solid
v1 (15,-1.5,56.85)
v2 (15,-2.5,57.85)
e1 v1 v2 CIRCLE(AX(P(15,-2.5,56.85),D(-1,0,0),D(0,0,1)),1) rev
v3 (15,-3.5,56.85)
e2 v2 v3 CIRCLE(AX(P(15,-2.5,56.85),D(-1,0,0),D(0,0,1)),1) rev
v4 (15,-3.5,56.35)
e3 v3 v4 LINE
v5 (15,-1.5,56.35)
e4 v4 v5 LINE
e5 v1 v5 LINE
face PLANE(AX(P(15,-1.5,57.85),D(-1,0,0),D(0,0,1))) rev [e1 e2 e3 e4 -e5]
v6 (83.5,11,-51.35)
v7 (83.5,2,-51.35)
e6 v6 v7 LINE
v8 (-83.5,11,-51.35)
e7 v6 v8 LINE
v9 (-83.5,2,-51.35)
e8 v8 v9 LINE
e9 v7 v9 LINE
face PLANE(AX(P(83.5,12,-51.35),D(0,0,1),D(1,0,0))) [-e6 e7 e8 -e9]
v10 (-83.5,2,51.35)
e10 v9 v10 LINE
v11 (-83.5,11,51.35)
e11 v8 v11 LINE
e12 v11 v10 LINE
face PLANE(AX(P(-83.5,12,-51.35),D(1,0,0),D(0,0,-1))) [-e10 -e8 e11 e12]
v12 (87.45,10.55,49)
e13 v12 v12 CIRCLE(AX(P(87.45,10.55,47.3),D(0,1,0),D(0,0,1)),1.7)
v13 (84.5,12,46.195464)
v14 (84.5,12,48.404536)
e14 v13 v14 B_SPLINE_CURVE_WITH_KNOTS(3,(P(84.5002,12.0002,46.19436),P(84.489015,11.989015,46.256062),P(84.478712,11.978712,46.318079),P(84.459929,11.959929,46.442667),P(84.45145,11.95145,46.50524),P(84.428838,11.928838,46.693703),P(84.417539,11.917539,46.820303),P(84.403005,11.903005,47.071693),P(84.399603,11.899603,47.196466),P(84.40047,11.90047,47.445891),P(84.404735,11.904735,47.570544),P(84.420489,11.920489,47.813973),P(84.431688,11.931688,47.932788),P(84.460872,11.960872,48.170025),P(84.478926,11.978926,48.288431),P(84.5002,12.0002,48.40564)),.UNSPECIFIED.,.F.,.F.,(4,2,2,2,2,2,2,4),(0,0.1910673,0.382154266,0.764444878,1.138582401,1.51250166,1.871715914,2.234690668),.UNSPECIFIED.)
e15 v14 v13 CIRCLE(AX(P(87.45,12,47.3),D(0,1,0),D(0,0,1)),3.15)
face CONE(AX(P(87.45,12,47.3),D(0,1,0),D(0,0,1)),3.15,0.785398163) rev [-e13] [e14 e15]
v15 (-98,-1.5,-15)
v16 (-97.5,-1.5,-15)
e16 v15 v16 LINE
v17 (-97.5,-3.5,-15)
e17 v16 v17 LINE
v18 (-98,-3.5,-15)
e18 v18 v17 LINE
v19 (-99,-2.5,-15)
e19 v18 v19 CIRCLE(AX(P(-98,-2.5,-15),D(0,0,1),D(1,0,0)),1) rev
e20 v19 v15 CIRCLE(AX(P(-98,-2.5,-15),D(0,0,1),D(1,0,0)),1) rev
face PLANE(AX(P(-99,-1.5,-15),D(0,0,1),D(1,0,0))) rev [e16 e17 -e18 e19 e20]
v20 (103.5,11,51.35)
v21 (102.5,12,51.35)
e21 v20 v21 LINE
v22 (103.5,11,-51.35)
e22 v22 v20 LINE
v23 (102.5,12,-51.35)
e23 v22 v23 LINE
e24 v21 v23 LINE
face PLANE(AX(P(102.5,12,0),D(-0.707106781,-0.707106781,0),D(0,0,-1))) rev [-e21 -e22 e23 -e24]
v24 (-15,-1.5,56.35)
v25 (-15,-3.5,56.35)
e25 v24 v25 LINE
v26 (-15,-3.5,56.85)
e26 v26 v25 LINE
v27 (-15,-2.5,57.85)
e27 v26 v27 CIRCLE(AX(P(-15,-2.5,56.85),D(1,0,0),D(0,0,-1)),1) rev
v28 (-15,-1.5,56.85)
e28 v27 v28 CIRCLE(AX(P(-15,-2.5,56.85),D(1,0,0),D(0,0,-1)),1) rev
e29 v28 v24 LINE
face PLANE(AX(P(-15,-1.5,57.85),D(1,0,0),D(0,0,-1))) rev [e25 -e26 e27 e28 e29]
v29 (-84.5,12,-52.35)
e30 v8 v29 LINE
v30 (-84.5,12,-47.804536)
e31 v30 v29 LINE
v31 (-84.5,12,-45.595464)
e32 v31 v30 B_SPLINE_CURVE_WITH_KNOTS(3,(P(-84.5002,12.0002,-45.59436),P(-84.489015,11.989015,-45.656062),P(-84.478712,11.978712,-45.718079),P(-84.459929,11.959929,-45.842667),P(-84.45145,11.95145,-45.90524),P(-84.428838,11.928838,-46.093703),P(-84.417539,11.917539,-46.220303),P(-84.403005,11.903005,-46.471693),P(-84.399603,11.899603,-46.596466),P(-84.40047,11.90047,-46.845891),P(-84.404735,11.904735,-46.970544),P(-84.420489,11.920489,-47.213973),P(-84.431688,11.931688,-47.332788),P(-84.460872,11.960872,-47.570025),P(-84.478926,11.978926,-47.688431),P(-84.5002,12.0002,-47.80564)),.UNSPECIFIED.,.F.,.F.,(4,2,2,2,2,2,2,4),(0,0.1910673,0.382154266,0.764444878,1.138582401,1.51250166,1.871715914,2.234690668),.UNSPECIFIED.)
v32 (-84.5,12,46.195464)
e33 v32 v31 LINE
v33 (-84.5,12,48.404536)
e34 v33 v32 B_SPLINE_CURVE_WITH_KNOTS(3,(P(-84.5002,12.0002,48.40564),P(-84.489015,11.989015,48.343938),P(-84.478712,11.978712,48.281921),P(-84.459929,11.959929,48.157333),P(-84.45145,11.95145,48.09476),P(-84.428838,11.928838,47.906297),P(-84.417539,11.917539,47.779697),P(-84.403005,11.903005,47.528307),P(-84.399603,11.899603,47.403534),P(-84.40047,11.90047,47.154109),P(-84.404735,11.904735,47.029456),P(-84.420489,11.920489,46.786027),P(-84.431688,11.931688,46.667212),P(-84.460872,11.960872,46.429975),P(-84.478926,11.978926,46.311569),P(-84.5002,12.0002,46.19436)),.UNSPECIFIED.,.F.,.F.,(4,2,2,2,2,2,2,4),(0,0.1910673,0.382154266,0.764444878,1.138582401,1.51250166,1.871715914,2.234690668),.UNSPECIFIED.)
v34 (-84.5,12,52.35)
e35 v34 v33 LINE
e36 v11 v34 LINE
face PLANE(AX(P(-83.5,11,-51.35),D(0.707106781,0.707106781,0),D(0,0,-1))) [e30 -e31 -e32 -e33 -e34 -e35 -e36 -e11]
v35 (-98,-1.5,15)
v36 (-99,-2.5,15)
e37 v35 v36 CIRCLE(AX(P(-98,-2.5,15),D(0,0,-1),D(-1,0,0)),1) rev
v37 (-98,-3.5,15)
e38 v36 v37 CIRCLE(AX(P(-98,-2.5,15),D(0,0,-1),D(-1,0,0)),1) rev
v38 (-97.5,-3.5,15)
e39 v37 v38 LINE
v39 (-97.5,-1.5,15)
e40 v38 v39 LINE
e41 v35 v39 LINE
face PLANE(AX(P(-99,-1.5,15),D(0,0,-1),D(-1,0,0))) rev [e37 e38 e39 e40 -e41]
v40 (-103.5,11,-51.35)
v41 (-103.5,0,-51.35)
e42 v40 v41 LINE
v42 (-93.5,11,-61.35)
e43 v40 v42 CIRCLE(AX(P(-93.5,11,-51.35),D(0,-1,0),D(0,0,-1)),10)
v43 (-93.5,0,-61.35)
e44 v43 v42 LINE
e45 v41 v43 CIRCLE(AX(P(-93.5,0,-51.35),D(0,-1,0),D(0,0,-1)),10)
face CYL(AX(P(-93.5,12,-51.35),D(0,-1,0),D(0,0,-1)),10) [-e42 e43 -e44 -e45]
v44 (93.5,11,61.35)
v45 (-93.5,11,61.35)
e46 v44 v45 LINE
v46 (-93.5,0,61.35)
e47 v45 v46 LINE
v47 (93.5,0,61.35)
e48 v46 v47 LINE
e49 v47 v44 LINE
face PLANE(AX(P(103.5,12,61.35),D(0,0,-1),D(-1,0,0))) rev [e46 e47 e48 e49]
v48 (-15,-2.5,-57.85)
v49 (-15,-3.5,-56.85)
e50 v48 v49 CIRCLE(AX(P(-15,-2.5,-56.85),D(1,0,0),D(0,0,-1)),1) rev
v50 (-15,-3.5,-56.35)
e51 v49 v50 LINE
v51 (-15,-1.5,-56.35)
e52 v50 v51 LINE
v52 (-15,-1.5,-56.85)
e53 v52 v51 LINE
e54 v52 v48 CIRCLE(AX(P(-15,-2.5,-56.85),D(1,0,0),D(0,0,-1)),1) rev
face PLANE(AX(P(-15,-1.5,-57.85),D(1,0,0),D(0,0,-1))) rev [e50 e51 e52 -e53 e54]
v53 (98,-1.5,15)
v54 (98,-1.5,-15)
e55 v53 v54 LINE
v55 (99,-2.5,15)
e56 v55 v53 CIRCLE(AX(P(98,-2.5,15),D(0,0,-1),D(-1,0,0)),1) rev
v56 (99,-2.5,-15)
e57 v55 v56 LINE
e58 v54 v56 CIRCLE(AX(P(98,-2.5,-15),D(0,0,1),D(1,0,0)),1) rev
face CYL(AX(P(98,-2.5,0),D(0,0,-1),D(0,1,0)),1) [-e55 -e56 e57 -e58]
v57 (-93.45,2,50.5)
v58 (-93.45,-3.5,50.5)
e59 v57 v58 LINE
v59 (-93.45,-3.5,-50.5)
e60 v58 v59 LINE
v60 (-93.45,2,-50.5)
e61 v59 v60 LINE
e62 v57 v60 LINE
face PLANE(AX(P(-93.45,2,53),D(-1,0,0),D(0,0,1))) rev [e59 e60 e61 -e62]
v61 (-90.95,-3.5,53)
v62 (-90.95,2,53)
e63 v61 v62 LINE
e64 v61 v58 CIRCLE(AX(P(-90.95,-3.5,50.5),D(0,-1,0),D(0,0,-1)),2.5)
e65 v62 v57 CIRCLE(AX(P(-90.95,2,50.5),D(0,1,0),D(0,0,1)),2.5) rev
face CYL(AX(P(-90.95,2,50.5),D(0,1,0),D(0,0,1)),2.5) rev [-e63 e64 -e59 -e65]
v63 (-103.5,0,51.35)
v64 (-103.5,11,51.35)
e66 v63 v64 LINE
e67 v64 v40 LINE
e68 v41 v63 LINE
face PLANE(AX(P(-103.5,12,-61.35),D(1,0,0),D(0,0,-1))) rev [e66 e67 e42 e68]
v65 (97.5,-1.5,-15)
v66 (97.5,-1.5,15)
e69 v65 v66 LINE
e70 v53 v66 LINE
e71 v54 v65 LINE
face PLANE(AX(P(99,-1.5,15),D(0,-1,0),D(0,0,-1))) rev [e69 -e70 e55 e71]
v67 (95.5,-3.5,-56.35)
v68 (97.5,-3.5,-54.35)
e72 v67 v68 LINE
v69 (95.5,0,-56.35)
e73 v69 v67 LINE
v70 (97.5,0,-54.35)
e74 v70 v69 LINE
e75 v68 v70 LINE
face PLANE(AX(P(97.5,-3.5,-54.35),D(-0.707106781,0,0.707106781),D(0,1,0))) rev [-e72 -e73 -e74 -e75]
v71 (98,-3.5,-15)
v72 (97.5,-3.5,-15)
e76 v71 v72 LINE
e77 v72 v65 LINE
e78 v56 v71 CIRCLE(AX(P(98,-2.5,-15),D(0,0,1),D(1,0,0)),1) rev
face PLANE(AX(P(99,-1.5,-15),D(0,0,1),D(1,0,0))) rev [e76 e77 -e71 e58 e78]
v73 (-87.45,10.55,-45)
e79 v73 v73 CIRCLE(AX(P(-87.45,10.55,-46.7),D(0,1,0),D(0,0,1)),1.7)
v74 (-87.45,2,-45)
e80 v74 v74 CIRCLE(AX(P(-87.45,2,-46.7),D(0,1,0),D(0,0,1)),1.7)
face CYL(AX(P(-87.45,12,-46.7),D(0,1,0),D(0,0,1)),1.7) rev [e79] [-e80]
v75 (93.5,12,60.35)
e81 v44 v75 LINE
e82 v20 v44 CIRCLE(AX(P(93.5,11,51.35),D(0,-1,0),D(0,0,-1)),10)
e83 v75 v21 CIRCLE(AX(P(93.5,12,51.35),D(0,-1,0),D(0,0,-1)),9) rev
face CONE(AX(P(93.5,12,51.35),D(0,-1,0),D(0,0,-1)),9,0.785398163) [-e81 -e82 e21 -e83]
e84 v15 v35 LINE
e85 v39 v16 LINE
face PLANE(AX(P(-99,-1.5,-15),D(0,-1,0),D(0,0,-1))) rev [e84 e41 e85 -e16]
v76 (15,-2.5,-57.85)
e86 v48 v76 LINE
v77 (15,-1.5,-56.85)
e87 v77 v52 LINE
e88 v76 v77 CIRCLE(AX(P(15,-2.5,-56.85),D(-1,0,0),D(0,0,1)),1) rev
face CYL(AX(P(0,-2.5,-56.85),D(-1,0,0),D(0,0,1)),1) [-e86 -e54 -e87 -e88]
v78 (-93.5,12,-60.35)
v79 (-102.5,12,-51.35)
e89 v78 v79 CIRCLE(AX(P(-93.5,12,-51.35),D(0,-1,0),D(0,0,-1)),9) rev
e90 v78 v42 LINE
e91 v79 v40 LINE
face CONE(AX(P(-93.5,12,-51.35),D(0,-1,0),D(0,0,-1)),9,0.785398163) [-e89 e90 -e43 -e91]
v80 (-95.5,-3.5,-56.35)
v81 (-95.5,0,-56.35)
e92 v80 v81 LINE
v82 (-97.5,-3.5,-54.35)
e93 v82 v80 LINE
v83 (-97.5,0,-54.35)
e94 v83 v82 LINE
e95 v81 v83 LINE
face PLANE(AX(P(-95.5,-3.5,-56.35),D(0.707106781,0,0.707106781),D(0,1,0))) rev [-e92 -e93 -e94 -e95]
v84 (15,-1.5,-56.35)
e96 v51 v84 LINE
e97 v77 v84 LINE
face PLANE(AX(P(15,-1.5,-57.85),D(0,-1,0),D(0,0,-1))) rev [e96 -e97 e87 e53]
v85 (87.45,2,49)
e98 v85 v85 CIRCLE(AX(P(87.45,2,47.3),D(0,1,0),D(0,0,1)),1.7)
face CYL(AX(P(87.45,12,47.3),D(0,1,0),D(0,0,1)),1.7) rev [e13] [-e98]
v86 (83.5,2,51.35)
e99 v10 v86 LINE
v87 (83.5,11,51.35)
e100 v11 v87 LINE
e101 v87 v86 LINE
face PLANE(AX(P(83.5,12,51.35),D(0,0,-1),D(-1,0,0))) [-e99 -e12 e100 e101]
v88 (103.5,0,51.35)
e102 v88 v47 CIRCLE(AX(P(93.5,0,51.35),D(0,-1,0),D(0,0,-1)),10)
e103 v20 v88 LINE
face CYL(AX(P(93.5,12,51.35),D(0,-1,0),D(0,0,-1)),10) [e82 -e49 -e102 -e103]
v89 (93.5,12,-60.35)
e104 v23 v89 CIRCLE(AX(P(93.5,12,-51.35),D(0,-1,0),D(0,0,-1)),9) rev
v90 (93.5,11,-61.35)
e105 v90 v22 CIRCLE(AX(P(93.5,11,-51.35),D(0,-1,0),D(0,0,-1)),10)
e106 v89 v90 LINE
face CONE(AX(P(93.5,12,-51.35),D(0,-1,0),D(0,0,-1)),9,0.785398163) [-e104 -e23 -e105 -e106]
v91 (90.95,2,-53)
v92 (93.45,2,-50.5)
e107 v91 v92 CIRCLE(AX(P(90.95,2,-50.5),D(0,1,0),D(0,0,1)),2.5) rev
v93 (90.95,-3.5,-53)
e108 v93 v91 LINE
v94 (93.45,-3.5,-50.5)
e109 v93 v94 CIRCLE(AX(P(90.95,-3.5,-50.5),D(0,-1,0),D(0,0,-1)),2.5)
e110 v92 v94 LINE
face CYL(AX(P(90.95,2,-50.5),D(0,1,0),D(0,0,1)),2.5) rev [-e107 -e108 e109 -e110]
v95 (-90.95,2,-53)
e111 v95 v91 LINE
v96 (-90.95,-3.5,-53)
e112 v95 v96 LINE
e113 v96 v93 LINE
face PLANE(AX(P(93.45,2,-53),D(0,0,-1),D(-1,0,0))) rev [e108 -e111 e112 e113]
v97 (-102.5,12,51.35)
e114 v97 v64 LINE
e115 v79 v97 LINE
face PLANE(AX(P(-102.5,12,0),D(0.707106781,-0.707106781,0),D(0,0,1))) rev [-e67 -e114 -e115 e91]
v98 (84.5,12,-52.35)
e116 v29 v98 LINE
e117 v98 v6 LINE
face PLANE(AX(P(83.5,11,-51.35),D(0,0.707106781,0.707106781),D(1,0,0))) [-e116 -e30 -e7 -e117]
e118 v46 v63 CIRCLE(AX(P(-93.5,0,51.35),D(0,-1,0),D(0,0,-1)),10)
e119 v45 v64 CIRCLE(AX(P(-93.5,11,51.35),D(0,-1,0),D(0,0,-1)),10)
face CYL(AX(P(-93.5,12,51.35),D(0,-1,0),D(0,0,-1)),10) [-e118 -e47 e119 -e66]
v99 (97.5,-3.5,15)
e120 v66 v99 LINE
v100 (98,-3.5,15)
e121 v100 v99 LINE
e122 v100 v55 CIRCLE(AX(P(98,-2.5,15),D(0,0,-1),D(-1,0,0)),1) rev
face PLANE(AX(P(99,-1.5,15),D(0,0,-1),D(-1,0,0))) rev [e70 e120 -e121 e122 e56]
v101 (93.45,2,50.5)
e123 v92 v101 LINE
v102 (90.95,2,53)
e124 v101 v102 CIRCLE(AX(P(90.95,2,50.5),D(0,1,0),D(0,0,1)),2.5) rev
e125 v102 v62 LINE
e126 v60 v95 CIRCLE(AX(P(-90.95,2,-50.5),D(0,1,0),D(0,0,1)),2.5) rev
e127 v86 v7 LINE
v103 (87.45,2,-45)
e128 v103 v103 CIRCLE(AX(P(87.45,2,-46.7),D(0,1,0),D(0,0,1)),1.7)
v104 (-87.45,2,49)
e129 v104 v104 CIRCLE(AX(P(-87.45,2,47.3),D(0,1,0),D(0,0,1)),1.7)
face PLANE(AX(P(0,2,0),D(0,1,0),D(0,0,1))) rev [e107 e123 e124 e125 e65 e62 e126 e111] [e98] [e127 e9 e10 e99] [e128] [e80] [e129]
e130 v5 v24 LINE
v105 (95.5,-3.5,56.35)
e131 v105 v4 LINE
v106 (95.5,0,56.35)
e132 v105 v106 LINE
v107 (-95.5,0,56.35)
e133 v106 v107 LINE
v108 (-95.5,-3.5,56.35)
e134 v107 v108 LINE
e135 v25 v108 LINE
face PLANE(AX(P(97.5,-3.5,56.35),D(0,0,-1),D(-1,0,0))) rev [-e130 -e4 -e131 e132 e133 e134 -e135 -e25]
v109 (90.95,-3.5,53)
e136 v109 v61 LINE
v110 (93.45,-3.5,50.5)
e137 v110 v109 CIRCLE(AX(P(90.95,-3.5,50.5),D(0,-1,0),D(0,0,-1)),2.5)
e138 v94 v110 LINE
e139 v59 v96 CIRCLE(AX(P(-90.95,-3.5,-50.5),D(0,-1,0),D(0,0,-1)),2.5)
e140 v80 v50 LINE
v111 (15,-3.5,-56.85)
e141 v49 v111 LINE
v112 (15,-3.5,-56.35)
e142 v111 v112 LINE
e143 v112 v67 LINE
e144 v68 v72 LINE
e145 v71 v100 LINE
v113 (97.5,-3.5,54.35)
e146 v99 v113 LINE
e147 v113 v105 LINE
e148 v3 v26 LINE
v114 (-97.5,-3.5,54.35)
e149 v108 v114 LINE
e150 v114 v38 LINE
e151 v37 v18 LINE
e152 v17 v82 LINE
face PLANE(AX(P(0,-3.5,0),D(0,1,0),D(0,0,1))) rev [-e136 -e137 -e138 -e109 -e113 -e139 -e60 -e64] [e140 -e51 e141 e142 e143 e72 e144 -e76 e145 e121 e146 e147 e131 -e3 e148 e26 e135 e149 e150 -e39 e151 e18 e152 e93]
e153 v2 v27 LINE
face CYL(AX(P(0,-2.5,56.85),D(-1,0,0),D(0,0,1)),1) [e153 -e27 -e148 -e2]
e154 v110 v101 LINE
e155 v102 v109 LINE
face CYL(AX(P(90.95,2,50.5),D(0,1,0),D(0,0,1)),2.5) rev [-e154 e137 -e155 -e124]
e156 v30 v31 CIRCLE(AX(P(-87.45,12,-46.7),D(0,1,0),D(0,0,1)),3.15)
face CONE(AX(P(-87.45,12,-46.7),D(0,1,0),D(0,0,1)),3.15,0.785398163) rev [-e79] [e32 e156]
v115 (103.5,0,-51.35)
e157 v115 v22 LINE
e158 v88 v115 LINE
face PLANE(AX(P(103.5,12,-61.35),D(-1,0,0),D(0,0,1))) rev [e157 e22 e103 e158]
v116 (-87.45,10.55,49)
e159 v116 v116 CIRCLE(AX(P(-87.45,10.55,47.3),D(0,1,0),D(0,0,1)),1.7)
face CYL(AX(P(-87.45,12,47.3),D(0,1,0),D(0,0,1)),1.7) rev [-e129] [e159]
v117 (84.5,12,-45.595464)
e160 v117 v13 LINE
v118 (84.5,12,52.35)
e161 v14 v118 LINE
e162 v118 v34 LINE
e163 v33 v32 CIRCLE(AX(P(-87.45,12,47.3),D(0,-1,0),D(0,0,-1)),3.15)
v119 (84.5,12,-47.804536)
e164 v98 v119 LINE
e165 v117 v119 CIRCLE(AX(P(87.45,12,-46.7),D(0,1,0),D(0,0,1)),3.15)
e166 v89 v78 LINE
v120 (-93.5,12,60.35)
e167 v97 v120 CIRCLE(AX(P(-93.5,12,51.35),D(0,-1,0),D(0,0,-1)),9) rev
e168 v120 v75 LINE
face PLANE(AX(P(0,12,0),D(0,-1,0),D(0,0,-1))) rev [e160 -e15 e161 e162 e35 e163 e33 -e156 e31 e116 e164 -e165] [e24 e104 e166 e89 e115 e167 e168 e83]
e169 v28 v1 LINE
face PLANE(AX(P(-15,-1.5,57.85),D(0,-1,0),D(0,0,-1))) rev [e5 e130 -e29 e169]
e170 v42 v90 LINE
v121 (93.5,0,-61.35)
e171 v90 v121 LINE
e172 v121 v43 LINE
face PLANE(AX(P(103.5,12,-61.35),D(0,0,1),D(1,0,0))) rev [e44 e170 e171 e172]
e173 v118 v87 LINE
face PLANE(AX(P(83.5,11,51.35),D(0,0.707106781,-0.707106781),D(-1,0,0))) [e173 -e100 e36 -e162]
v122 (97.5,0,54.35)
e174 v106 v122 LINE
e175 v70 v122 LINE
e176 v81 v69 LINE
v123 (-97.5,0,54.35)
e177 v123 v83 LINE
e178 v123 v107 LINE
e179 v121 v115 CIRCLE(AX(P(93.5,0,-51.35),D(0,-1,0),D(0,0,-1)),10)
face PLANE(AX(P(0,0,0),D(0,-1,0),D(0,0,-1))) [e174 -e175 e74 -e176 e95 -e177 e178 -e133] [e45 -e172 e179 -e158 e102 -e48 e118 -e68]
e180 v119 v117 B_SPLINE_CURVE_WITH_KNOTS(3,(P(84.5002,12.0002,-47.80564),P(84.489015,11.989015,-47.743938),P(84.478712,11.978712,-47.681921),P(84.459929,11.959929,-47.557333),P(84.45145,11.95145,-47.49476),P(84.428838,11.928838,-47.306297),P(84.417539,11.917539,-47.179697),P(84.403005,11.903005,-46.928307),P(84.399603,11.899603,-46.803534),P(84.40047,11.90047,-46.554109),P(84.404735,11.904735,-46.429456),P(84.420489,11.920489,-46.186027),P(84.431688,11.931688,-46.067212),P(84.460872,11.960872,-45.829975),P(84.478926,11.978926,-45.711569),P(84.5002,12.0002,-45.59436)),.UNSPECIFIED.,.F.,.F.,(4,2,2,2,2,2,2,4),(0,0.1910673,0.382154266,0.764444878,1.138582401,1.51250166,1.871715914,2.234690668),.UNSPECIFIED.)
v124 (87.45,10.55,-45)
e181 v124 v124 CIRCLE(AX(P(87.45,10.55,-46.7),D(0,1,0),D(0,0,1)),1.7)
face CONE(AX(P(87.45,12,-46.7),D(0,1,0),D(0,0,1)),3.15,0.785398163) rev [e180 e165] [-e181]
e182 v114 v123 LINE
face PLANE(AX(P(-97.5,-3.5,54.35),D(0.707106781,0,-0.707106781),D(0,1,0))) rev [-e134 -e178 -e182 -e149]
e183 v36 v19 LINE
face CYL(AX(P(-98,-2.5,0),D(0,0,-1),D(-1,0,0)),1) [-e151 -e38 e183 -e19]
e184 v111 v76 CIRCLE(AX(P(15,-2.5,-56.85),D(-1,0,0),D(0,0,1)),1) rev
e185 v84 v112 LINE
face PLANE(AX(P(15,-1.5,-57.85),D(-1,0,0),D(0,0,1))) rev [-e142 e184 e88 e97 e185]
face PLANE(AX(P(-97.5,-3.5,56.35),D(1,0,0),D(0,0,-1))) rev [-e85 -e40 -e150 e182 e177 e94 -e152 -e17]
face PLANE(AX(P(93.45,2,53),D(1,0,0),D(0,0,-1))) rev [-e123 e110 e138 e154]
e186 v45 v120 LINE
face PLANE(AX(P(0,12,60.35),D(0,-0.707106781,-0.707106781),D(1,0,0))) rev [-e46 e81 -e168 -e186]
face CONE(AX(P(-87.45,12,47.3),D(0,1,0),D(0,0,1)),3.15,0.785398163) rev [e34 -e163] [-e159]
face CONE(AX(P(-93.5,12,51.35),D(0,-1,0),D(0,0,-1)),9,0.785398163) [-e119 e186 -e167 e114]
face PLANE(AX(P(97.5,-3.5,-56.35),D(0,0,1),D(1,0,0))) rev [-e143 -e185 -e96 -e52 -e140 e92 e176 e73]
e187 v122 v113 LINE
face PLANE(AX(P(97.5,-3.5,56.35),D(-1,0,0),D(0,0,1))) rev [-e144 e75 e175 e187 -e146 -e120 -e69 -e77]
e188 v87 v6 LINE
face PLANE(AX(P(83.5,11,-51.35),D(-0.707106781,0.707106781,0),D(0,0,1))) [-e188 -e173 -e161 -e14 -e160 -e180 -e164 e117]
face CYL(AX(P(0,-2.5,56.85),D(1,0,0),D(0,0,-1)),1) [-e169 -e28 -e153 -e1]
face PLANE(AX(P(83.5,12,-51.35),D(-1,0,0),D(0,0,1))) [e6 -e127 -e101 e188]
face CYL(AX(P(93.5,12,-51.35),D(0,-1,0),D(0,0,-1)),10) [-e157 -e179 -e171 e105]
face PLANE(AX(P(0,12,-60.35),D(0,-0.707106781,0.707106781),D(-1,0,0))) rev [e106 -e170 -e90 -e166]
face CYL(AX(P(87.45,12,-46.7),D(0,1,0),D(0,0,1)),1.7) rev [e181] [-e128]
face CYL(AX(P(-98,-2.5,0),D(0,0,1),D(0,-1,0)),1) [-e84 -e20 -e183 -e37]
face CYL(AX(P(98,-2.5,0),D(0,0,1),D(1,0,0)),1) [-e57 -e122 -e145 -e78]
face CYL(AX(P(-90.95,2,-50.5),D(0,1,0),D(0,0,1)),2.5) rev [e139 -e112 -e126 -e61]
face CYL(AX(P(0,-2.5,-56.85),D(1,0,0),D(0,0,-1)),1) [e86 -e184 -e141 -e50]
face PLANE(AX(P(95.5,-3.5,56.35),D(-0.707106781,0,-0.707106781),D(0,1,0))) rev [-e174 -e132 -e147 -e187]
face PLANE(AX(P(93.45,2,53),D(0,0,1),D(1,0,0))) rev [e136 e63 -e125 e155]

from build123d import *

# Parameters (mm, degrees)
SKETCH1_W                                            = 207
SKETCH1_H                                            = 122.7
SKETCH1_W_2                                          = 167
SKETCH1_H_2                                          = 102.7
EXTRUDE1_DEPTH                                       = 12
FILLET1_R                                            = 10
CHAMFER1_SIZE                                        = 1
SKETCH2_W                                            = 186.9
SKETCH2_H                                            = 106
EXTRUDE2_DEPTH                                       = 2
FILLET2_R                                            = 2.5
SKETCH3_W                                            = 195
SKETCH3_H                                            = 112.7
EXTRUDE3_DEPTH                                       = 3.5
F_2_0_2_DIAMETER_HOLE1_D                             = 2
CSK_FOR_M3_COUNTERSUNK_RAISED_HEAD_SCREW_D           = 3.4
CSK_FOR_M3_COUNTERSUNK_RAISED_HEAD_SCREW_CSINK_D     = 6.3
CSK_FOR_M3_COUNTERSUNK_RAISED_HEAD_SCREW_CSINK_ANGLE = 90
CHAMFER2_SIZE                                        = 2
SKETCH12_W                                           = 30
SKETCH12_H                                           = 2
EXTRUDE4_DEPTH                                       = 1.5
FILLET3_R                                            = 1
SKETCH13_W                                           = 30
SKETCH13_H                                           = 2
EXTRUDE5_DEPTH                                       = 1.5
FILLET4_R                                            = 1
SKETCH14_W                                           = 30
SKETCH14_H                                           = 2
EXTRUDE6_DEPTH                                       = 1.5
FILLET5_R                                            = 1
SKETCH15_W                                           = 30
SKETCH15_H                                           = 2
EXTRUDE7_DEPTH                                       = 1.5
FILLET6_R                                            = 1


with BuildPart() as part:
    # Sketch1 → Extrude1 (new body)
    with BuildSketch(Plane(origin=(0, 0, 0), x_dir=(1, 0, 0), z_dir=(0, 1, 0))):
        Rectangle(SKETCH1_W, SKETCH1_H)
        Rectangle(SKETCH1_W_2, SKETCH1_H_2, mode=Mode.SUBTRACT)
    extrude(amount=EXTRUDE1_DEPTH)

    # Fillet1
    fillet1_edges = [part.edges().sort_by_distance(p)[0] for p in [
        (-103.5, 6, -61.35),
        (103.5, 6, -61.35),
        (103.5, 6, 61.35),
        (-103.5, 6, 61.35),
    ]]
    fillet(fillet1_edges, radius=FILLET1_R)

    # Chamfer1
    chamfer1_edges = [part.edges().sort_by_distance(p)[0] for p in [
        (-83.5, 12, 0),
        (0, 12, 51.35),
        (83.5, 12, 0),
        (0, 12, -51.35),
        (103.5, 12, 0),
        (0, 12, 61.35),
        (-103.5, 12, 0),
        (0, 12, -61.35),
        (-100.571067812, 12, 58.421067812),
        (-100.571067812, 12, -58.421067812),
        (100.571067812, 12, -58.421067812),
        (100.571067812, 12, 58.421067812),
    ]]
    chamfer(chamfer1_edges, length=CHAMFER1_SIZE)

    # Sketch2 → Extrude2 (cut)
    with BuildSketch(Plane.XZ):
        Rectangle(SKETCH2_W, SKETCH2_H)
    extrude(amount=-EXTRUDE2_DEPTH, mode=Mode.SUBTRACT)

    # Fillet2
    fillet2_edges = [part.edges().sort_by_distance(p)[0] for p in [
        (-93.45, 1, -53),
        (-93.45, 1, 53),
        (93.45, 1, 53),
        (93.45, 1, -53),
    ]]
    fillet(fillet2_edges, radius=FILLET2_R)

    # Sketch3 → Extrude3 (add)
    with BuildSketch(Plane.XZ):
        Rectangle(SKETCH3_W, SKETCH3_H)
        with BuildLine():
            Line((-90.95, -53), (90.95, -53))
            ThreePointArc((90.95, -53), (92.717766953, -52.267766953), (93.45, -50.5))
            Line((93.45, -50.5), (93.45, 50.5))
            ThreePointArc((93.45, 50.5), (92.717766953, 52.267766953), (90.95, 53))
            Line((90.95, 53), (-90.95, 53))
            ThreePointArc((-90.95, 53), (-92.717766953, 52.267766953), (-93.45, 50.5))
            Line((-93.45, 50.5), (-93.45, -50.5))
            ThreePointArc((-93.45, -50.5), (-92.717766953, -52.267766953), (-90.95, -53))
        make_face(mode=Mode.SUBTRACT)
    extrude(amount=EXTRUDE3_DEPTH)

    # Ø2.0 (2) Diameter Hole1 (through all)
    with Locations(Plane(origin=(-103.5, 2, 61.35), x_dir=(1, 0, 0), z_dir=(0, -1, 0))):
        with Locations((190.95, -14.05), (190.95, -108.05), (16.05, -108.05), (16.05, -14.05)):
            Hole(F_2_0_2_DIAMETER_HOLE1_D / 2)

    # CSK for M3 Countersunk Raised Head Screw2 (through all)
    with Locations(Plane(origin=(0, 12, 0), x_dir=(1, 0, 0), z_dir=(0, 1, 0))):
        with Locations((87.45, 46.7), (87.45, -47.3), (-87.45, -47.3), (-87.45, 46.7)):
            CounterSinkHole(CSK_FOR_M3_COUNTERSUNK_RAISED_HEAD_SCREW_D / 2, CSK_FOR_M3_COUNTERSUNK_RAISED_HEAD_SCREW_CSINK_D / 2, counter_sink_angle=CSK_FOR_M3_COUNTERSUNK_RAISED_HEAD_SCREW_CSINK_ANGLE)

    # Chamfer2
    chamfer2_edges = [part.edges().sort_by_distance(p)[0] for p in [
        (-97.5, -1.75, 56.35),
        (-97.5, -1.75, -56.35),
        (97.5, -1.75, -56.35),
        (97.5, -1.75, 56.35),
    ]]
    chamfer(chamfer2_edges, length=CHAMFER2_SIZE)

    # Sketch12 → Extrude4 (add)
    with BuildSketch(Plane.ZY.offset(97.5)):
        with Locations((0, -2.5)):
            Rectangle(SKETCH12_W, SKETCH12_H)
    extrude(amount=EXTRUDE4_DEPTH)

    # Fillet3
    fillet3_edges = [part.edges().sort_by_distance(p)[0] for p in [
        (-99, -3.5, 0),
        (-99, -1.5, 0),
    ]]
    fillet(fillet3_edges, radius=FILLET3_R - 0.0001)  # a hair under: the kernel refuses the full size

    # Sketch13 → Extrude5 (add)
    with BuildSketch(Plane(origin=(97.5, 0, 0), x_dir=(0, 0, -1), z_dir=(1, 0, 0))):
        with Locations((0, -2.5)):
            Rectangle(SKETCH13_W, SKETCH13_H)
    extrude(amount=EXTRUDE5_DEPTH)

    # Fillet4
    fillet4_edges = [part.edges().sort_by_distance(p)[0] for p in [
        (99, -1.5, 0),
        (99, -3.5, 0),
    ]]
    fillet(fillet4_edges, radius=FILLET4_R - 0.0001)  # a hair under: the kernel refuses the full size

    # Sketch14 → Extrude6 (add)
    with BuildSketch(Plane.XY.offset(56.35)):
        with Locations((0, -2.5)):
            Rectangle(SKETCH14_W, SKETCH14_H)
    extrude(amount=EXTRUDE6_DEPTH)

    # Fillet5
    fillet5_edges = [part.edges().sort_by_distance(p)[0] for p in [
        (0, -3.5, 57.85),
        (0, -1.5, 57.85),
    ]]
    fillet(fillet5_edges, radius=FILLET5_R - 0.0001)  # a hair under: the kernel refuses the full size

    # Sketch15 → Extrude7 (add)
    with BuildSketch(Plane(origin=(0, 0, -56.35), x_dir=(-1, 0, 0), z_dir=(0, 0, -1))):
        with Locations((0, -2.5)):
            Rectangle(SKETCH15_W, SKETCH15_H)
    extrude(amount=EXTRUDE7_DEPTH)

    # Fillet6
    fillet6_edges = [part.edges().sort_by_distance(p)[0] for p in [
        (0, -3.5, -57.85),
        (0, -1.5, -57.85),
    ]]
    fillet(fillet6_edges, radius=FILLET6_R - 0.0001)  # a hair under: the kernel refuses the full size


solid = part.part
